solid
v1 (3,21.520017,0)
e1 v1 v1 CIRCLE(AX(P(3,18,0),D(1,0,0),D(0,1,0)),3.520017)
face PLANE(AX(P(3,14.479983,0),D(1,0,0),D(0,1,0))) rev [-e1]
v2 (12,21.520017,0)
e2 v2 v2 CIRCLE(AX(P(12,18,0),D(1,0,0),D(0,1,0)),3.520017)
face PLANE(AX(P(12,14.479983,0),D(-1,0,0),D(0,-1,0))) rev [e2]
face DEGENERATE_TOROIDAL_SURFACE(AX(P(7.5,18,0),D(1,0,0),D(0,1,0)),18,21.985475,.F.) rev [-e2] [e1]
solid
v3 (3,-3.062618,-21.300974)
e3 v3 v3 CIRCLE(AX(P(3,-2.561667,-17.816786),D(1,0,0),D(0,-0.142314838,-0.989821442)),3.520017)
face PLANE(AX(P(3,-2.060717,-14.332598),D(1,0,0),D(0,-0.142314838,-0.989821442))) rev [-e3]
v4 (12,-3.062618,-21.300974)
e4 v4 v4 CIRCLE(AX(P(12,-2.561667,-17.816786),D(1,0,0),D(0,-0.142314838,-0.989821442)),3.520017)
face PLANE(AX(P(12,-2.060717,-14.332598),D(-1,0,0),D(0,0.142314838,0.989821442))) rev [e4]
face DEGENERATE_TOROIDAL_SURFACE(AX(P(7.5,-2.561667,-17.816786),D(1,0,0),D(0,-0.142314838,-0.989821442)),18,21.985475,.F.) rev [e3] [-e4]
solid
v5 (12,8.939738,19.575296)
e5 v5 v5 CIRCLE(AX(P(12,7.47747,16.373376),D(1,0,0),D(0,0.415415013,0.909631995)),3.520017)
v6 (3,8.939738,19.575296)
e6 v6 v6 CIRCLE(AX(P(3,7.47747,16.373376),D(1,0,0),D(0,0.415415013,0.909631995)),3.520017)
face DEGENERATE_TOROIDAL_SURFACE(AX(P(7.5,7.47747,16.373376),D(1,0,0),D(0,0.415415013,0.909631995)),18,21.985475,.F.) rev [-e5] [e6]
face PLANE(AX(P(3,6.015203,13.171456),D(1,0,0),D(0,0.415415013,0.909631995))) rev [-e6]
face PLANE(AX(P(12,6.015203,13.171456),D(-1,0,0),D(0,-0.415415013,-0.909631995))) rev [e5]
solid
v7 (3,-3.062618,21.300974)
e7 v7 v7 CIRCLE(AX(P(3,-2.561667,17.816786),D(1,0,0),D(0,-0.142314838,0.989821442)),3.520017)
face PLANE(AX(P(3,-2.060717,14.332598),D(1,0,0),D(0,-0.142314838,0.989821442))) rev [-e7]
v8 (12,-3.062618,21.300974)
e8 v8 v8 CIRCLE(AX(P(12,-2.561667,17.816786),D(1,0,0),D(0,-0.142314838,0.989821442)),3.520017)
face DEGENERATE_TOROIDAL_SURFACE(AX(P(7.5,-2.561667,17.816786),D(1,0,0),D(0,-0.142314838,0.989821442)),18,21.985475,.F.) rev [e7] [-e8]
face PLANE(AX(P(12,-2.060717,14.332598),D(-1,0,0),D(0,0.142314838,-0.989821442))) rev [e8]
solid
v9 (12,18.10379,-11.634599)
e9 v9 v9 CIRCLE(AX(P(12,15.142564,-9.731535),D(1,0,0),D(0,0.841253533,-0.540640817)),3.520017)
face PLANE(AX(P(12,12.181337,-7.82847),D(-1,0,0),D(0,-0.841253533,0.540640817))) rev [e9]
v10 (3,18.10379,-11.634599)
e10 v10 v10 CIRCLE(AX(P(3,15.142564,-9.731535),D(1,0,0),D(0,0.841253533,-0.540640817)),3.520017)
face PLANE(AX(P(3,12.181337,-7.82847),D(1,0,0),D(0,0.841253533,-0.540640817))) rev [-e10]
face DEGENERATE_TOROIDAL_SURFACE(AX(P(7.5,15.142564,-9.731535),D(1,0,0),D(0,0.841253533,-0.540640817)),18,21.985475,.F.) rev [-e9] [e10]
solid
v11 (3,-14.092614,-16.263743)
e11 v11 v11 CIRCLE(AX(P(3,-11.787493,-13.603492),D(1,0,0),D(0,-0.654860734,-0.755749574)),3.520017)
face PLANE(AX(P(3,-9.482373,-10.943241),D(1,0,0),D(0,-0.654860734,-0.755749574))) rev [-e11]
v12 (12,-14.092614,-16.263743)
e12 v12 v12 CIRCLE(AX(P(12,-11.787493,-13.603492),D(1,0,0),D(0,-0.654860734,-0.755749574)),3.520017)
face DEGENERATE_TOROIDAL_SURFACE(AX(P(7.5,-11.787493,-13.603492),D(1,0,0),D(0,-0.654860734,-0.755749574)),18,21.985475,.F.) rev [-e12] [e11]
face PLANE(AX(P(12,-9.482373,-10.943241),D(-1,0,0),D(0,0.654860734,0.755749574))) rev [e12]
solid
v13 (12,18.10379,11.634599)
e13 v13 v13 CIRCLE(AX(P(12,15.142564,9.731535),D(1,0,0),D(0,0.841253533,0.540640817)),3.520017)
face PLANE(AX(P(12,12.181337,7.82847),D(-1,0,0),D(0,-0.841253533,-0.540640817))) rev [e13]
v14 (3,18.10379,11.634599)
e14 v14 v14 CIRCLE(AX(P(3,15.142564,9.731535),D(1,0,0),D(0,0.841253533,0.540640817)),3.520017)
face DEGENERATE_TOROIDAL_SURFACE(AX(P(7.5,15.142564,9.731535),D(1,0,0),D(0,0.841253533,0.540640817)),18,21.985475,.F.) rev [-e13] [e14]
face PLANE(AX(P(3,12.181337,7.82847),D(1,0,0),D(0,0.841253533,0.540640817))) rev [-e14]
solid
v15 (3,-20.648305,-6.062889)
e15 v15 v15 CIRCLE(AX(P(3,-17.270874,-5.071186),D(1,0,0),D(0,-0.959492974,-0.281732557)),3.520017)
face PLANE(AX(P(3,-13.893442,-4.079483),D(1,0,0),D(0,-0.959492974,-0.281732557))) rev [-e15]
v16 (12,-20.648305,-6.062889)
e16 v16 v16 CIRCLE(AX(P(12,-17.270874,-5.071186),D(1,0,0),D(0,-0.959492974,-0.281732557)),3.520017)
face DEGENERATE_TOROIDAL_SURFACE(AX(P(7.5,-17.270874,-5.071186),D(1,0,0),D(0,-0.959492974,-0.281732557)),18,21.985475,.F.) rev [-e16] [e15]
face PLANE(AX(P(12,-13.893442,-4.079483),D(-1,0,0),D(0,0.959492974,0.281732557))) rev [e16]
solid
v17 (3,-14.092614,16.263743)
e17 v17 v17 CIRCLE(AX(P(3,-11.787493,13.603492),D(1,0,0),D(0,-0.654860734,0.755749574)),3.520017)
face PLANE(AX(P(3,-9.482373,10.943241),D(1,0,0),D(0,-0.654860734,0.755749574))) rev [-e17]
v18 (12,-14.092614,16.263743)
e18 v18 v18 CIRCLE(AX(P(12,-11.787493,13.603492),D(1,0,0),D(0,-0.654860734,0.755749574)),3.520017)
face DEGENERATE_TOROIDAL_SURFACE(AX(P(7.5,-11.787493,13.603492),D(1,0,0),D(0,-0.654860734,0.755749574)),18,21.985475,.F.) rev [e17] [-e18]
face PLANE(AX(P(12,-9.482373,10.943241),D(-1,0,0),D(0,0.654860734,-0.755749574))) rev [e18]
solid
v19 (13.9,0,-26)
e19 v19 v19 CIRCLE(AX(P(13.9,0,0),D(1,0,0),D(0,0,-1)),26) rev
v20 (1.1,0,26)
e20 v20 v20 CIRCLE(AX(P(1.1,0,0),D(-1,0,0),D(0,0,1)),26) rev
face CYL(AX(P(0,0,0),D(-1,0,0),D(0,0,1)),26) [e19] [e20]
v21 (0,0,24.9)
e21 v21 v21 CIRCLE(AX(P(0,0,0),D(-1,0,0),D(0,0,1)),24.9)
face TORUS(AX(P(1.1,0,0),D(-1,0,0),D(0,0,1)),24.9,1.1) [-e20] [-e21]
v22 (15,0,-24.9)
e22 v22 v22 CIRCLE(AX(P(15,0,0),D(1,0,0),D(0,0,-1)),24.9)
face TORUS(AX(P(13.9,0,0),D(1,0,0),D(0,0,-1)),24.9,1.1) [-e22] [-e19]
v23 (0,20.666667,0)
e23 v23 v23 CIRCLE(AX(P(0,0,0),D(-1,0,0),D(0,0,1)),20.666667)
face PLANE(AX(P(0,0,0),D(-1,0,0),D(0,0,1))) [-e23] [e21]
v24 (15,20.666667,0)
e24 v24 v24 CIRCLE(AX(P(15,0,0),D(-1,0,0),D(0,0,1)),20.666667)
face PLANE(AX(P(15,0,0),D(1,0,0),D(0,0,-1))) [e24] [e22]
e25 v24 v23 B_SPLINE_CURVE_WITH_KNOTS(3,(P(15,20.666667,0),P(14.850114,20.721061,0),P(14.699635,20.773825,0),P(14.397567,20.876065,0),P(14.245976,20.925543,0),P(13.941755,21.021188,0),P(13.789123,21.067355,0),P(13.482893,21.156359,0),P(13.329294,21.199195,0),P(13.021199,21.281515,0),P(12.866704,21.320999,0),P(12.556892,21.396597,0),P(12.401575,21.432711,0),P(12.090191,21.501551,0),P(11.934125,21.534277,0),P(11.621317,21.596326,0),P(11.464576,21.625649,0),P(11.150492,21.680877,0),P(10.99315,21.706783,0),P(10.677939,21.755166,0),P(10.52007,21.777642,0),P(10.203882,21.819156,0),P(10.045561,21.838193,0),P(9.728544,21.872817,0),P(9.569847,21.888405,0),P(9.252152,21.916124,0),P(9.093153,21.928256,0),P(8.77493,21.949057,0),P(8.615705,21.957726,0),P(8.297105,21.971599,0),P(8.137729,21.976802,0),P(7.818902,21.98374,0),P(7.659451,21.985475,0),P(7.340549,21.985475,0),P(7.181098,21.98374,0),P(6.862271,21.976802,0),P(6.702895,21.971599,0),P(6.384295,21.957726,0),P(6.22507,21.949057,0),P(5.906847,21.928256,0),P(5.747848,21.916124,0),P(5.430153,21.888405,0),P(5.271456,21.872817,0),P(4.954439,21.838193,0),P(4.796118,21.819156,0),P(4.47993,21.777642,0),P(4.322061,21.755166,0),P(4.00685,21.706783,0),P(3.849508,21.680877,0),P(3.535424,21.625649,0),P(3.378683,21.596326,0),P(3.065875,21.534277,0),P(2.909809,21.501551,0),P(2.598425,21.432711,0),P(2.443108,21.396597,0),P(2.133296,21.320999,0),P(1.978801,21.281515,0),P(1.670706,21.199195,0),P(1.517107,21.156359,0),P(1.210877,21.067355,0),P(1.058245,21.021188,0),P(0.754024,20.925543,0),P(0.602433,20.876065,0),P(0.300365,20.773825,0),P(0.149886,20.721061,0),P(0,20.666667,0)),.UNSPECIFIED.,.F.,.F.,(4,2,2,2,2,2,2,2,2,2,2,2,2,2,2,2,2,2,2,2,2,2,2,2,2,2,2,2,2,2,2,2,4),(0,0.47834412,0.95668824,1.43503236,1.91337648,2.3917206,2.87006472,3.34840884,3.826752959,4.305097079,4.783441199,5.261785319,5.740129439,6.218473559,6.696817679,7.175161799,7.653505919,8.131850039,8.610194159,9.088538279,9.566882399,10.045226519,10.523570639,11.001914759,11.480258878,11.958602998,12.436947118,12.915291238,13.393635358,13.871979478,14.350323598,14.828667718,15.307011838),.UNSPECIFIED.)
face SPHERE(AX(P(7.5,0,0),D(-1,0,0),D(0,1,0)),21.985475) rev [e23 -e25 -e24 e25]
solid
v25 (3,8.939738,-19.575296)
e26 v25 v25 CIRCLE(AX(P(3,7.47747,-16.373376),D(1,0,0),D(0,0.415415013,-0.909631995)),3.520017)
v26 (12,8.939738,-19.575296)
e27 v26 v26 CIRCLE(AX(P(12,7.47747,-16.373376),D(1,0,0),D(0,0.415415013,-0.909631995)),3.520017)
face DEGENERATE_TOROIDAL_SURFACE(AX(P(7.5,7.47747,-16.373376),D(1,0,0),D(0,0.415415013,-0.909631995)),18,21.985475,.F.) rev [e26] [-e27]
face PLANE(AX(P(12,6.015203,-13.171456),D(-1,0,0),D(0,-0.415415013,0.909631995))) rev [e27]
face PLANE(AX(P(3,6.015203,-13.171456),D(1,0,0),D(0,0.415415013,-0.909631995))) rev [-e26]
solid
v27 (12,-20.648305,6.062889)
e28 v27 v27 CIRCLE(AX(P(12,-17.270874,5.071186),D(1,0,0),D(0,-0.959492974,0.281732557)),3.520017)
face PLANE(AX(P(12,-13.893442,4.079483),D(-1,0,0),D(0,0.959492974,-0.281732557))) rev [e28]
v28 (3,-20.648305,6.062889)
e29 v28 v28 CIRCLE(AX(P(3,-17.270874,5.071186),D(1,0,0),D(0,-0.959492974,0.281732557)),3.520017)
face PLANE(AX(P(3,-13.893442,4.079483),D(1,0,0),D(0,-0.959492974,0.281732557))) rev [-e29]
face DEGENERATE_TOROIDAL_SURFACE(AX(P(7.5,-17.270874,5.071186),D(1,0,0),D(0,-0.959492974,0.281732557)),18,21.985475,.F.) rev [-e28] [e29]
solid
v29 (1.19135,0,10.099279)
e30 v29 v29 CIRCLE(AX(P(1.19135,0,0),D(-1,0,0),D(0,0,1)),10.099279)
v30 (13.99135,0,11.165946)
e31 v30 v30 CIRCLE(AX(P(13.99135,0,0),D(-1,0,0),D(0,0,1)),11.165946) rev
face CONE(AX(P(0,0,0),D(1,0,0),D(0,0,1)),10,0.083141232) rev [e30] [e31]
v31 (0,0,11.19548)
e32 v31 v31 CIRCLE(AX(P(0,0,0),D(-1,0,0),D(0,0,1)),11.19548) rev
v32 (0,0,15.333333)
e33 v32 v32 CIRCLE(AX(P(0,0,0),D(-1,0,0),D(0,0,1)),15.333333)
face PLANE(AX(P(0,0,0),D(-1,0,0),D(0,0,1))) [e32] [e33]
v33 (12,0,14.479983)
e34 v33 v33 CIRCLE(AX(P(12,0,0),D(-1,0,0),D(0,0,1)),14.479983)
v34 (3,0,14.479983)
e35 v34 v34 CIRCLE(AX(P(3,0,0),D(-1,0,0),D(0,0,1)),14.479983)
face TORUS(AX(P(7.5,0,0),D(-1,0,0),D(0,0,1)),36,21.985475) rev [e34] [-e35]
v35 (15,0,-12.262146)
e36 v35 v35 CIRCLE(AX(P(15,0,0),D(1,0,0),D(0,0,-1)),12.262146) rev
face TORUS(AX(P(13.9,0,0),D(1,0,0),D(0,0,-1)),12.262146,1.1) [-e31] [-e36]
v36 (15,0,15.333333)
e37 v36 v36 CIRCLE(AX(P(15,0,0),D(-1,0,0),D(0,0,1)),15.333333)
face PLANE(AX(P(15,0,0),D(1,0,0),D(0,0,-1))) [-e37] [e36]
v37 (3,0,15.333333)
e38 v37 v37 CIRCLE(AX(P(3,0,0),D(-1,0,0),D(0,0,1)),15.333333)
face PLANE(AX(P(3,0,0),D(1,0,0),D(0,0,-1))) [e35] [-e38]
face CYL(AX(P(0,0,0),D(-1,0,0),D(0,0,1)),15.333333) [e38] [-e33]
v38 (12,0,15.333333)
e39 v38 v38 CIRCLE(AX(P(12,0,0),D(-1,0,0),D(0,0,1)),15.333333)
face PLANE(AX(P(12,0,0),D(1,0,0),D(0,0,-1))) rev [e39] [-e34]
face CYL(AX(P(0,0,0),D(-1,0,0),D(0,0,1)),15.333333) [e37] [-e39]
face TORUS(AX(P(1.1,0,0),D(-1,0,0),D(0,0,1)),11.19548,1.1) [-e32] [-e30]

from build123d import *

# Parameters (mm, degrees)
CIRPATTERN3_COUNT = 11
FILLET1_R         = 1.1
FILLET2_R         = 1.1


# Read off the part's stored shape, not the designer's step: Draft4
with BuildPart() as part:
    # Sketch1 → Revolve1 (revolve)
    with BuildSketch(Plane.XY, mode=Mode.PRIVATE) as revolve1_sk:
        with BuildLine():
            Line((0, 26), (0, 20.666666667))
            ThreePointArc((0, 20.666666667), (7.5, 21.985475003), (15, 20.666666667))
            Line((15, 20.666666667), (15, 26))
            Line((15, 26), (0, 26))
        make_face()
        with BuildLine():
            Line((0, 15.333333333), (0, 10))
            Line((0, 10), (15, 10))
            Line((15, 10), (15, 15.333333333))
            Line((15, 15.333333333), (12, 15.333333333))
            Line((12, 15.333333333), (12, 14.479983478))
            ThreePointArc((12, 14.479983478), (7.5, 14.014524997), (3, 14.479983478))
            Line((3, 14.479983478), (3, 15.333333333))
            Line((3, 15.333333333), (0, 15.333333333))
        make_face()
    revolve(revolve1_sk.sketch.rotate(Axis((0, 0, 0), (1, 0, 0)), 90), axis=Axis((0, 0, 0), (1, 0, 0)))

    # Draft4 outline → Draft4 (revolve, cut)
    with BuildSketch(Plane.YX):
        Polygon((10, 15), (10, 0), (11.25, 15), align=None)
    revolve(axis=Axis((0, 0, 0), (1, 0, 0)), mode=Mode.SUBTRACT)

    # Fillet1
    fillet1_edges = [part.edges().sort_by_distance(p)[0] for p in [
        (0, 0, -26),
        (15, 0, -26),
    ]]
    fillet(fillet1_edges, radius=FILLET1_R)

    # Fillet2
    fillet2_edges = [part.edges().sort_by_distance(p)[0] for p in [
        (15, -11.25, 0),
        (0, -10, 0),
    ]]
    fillet(fillet2_edges, radius=FILLET2_R)


with BuildPart() as body_2:
    # Sketch3 → Revolve3 (revolve)
    with BuildSketch(Plane.XY, mode=Mode.PRIVATE) as revolve3_sk:
        with BuildLine():
            Line((12, 14.479983478), (12, 18))
            Line((12, 18), (3, 18))
            Line((3, 18), (3, 14.479983478))
            ThreePointArc((3, 14.479983478), (7.5, 14.014524997), (12, 14.479983478))
        make_face()
    revolve(revolve3_sk.sketch.rotate(Axis((12, 18, 0), (-1, 0, 0)), 180), axis=Axis((12, 18, 0), (-1, 0, 0)))


with BuildPart() as cirpattern3_1:
    # CirPattern3: pattern copy
    add(body_2.part.rotate(Axis((0, 0, 0), (1, 0, 0)), 1 * 360 / CIRPATTERN3_COUNT))


with BuildPart() as cirpattern3_2:
    # CirPattern3: pattern copy
    add(body_2.part.rotate(Axis((0, 0, 0), (1, 0, 0)), 2 * 360 / CIRPATTERN3_COUNT))


with BuildPart() as cirpattern3_3:
    # CirPattern3: pattern copy
    add(body_2.part.rotate(Axis((0, 0, 0), (1, 0, 0)), 3 * 360 / CIRPATTERN3_COUNT))


with BuildPart() as cirpattern3_4:
    # CirPattern3: pattern copy
    add(body_2.part.rotate(Axis((0, 0, 0), (1, 0, 0)), 4 * 360 / CIRPATTERN3_COUNT))


with BuildPart() as cirpattern3_5:
    # CirPattern3: pattern copy
    add(body_2.part.rotate(Axis((0, 0, 0), (1, 0, 0)), 5 * 360 / CIRPATTERN3_COUNT))


with BuildPart() as cirpattern3_6:
    # CirPattern3: pattern copy
    add(body_2.part.rotate(Axis((0, 0, 0), (1, 0, 0)), 6 * 360 / CIRPATTERN3_COUNT))


with BuildPart() as cirpattern3_7:
    # CirPattern3: pattern copy
    add(body_2.part.rotate(Axis((0, 0, 0), (1, 0, 0)), 7 * 360 / CIRPATTERN3_COUNT))


with BuildPart() as cirpattern3_8:
    # CirPattern3: pattern copy
    add(body_2.part.rotate(Axis((0, 0, 0), (1, 0, 0)), 8 * 360 / CIRPATTERN3_COUNT))


with BuildPart() as cirpattern3_9:
    # CirPattern3: pattern copy
    add(body_2.part.rotate(Axis((0, 0, 0), (1, 0, 0)), 9 * 360 / CIRPATTERN3_COUNT))


with BuildPart() as cirpattern3_10:
    # CirPattern3: pattern copy
    add(body_2.part.rotate(Axis((0, 0, 0), (1, 0, 0)), 10 * 360 / CIRPATTERN3_COUNT))


solid = Compound([part.part, body_2.part, cirpattern3_1.part, cirpattern3_2.part, cirpattern3_3.part, cirpattern3_4.part, cirpattern3_5.part, cirpattern3_6.part, cirpattern3_7.part, cirpattern3_8.part, cirpattern3_9.part, cirpattern3_10.part])
